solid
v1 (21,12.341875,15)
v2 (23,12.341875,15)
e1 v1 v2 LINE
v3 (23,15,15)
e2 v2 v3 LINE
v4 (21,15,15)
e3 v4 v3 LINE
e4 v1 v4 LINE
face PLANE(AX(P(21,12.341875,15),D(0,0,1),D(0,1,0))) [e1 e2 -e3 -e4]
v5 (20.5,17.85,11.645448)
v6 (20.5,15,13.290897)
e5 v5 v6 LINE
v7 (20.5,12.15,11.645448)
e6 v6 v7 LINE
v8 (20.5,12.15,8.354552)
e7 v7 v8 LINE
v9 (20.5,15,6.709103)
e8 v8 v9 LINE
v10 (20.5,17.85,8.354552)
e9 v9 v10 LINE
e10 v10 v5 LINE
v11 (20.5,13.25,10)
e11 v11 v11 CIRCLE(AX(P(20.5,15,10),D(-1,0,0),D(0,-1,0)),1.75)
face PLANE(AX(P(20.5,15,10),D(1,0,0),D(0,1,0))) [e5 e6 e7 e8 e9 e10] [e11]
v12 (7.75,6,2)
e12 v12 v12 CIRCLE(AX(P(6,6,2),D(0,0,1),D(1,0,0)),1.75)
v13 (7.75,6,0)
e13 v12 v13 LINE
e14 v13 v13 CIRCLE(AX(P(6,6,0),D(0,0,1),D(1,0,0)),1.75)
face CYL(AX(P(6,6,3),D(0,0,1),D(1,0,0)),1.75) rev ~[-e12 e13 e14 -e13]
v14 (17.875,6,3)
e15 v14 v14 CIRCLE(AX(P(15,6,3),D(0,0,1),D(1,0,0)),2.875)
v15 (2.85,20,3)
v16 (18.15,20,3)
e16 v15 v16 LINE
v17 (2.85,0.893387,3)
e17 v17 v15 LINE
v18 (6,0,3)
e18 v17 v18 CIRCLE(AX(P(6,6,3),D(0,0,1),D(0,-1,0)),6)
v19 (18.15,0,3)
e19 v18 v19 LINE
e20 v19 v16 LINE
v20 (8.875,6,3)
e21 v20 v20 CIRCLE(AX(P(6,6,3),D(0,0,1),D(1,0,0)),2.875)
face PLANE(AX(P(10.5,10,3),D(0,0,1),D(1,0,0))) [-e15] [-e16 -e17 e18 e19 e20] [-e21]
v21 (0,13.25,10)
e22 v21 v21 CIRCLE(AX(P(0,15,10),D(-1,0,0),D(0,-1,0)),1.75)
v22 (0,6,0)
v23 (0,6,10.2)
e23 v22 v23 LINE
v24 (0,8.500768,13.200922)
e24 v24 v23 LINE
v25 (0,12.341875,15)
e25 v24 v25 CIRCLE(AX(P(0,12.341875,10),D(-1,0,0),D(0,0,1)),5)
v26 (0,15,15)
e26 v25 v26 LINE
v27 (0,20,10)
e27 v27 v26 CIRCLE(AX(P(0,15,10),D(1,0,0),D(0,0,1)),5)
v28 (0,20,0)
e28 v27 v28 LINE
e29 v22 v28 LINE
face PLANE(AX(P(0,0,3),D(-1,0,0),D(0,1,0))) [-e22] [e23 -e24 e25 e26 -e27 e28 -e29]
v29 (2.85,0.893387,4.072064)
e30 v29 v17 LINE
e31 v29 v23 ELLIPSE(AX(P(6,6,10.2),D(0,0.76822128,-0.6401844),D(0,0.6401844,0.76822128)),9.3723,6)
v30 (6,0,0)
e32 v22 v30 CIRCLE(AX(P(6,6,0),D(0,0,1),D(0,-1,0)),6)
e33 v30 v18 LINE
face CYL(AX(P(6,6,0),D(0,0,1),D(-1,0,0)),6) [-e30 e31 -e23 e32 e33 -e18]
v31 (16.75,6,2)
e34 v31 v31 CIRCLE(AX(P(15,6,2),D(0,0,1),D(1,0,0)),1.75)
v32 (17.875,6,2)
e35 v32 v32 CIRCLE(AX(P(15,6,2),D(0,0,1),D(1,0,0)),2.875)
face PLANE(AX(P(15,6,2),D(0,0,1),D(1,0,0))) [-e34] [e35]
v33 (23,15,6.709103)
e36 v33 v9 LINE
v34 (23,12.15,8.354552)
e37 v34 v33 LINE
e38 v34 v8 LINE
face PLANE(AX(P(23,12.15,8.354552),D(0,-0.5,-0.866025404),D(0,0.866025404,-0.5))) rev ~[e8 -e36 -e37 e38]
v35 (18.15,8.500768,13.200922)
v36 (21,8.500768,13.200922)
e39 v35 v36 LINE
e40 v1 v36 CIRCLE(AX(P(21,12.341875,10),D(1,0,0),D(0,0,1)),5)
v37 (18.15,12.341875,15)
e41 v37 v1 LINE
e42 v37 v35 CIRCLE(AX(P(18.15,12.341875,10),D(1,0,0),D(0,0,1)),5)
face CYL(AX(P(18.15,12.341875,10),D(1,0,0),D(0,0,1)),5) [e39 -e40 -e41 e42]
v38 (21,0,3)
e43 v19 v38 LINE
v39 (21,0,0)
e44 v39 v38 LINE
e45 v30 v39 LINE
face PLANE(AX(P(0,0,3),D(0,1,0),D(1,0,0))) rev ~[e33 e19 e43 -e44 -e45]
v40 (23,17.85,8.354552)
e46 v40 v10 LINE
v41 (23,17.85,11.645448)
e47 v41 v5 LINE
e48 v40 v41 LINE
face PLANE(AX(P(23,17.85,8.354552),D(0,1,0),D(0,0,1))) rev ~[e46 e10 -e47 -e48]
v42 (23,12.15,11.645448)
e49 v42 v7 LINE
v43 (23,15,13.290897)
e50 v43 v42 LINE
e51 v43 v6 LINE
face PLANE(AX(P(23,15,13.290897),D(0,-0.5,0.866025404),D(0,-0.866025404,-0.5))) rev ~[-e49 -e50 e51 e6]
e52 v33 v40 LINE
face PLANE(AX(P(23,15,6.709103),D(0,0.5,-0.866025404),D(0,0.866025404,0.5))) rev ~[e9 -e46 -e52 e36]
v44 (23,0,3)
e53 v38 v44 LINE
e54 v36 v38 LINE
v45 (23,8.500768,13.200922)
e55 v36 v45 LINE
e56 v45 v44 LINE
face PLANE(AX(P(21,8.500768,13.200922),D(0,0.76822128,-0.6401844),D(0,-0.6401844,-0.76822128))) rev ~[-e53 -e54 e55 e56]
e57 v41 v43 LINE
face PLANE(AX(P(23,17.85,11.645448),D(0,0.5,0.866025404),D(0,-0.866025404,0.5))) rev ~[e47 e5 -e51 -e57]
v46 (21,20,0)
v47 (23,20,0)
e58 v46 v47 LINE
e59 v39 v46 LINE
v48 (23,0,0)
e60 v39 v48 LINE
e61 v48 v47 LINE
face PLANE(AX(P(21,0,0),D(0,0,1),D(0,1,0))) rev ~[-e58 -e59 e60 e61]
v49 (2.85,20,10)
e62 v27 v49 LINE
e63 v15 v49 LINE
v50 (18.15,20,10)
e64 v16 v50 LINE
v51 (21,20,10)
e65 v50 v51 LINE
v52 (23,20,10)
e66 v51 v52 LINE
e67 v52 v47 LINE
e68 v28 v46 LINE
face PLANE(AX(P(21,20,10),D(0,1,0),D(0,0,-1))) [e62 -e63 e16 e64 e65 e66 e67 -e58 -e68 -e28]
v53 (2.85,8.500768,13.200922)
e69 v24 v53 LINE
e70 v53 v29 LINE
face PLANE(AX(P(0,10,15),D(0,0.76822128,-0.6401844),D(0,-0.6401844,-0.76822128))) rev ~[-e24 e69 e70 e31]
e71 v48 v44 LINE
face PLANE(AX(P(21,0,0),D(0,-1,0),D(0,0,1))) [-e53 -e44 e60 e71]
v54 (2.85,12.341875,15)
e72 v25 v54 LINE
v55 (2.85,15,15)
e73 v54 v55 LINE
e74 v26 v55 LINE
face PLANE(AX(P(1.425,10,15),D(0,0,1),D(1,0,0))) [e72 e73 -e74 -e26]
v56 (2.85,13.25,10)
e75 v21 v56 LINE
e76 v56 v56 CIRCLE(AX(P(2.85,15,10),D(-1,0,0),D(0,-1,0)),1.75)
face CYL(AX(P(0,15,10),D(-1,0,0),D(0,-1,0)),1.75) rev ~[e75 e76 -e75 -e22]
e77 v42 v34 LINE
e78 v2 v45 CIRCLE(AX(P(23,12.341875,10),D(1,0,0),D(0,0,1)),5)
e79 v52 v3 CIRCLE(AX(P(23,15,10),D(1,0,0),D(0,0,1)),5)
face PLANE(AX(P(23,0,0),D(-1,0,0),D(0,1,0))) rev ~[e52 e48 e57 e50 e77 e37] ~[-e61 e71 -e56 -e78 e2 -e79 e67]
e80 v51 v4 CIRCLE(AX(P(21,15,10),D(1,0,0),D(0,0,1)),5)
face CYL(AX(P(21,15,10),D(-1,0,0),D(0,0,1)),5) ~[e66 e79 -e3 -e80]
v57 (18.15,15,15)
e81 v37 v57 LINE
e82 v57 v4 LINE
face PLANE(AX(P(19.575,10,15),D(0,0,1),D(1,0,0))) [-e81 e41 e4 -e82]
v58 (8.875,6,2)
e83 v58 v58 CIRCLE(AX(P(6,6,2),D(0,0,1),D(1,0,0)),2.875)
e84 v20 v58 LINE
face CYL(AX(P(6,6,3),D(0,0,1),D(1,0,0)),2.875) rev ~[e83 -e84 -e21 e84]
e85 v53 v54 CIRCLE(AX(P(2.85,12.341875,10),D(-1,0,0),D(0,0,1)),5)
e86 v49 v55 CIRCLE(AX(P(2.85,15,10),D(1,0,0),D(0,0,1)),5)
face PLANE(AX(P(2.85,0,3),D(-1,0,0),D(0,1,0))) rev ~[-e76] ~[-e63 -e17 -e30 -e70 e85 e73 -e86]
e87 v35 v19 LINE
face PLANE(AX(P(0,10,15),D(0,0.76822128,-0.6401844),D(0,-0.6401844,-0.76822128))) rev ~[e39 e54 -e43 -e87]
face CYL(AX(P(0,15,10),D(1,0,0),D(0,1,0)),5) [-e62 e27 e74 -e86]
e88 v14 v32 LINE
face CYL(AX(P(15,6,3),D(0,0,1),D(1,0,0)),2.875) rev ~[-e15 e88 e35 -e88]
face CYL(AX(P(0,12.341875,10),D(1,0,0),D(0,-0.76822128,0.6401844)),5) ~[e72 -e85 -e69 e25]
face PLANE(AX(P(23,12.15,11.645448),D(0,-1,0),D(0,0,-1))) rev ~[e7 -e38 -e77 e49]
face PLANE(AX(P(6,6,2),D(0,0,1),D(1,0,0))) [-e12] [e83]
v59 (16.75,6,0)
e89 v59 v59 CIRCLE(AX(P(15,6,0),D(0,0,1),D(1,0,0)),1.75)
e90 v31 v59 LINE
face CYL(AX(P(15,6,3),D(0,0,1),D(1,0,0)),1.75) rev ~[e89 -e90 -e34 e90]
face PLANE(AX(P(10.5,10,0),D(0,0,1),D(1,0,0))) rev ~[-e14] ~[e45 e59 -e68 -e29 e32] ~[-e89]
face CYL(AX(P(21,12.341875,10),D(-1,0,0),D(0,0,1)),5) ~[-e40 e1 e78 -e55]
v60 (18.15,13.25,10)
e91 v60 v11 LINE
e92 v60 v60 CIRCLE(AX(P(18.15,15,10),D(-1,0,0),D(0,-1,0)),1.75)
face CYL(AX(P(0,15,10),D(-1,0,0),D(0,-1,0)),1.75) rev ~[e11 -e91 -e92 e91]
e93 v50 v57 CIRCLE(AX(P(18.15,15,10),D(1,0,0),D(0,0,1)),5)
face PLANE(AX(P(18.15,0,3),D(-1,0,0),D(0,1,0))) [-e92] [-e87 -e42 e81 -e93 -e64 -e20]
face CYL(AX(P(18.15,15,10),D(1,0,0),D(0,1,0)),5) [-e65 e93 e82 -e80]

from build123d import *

# Parameters (mm, degrees)
F0_W      = 21
F0_H      = 20
F1_DEPTH  = 3
F2_W      = 2.85
F2_H      = 20
F3_DEPTH  = 12
F4_R      = 6
F5_R      = 1.75
F6_DEPTH  = 21.001
F7_R      = 5
F8_R      = 1.75
F9_DEPTH  = 3.001
F10_DEPTH = 2
F12_DEPTH = 2.5
F13_R     = 2.875
F14_DEPTH = 1


with BuildPart() as f1:
    # F0 (on Top) → F1 (new body)
    with BuildSketch(Plane.XY):
        with Locations((10.5, 10)):
            Rectangle(F0_W, F0_H)
    extrude(amount=F1_DEPTH)

    # F2 (on face) → F3 (join)
    with BuildSketch(Plane.XY.offset(3)):
        with Locations((1.425, 10)):
            Rectangle(F2_W, F2_H)
        with Locations((19.575, 10)):
            Rectangle(F2_W, F2_H)
    extrude(amount=F3_DEPTH)

    # F4
    f4_edges = [f1.edges().sort_by_distance(p)[0] for p in [
        (0, 0, 7.5),
    ]]
    fillet(f4_edges, radius=F4_R)

    # F5 (on face) → F6 (cut, through all)
    with BuildSketch(Plane(origin=(0, 0, 0), x_dir=(0, -1, 0), z_dir=(-1, 0, 0))):
        with Locations((-15, 10)):
            Circle(F5_R)
        Polygon((0, 15), (-10, 15), (0, 3), align=None)
    extrude(amount=-F6_DEPTH, mode=Mode.SUBTRACT)

    # F7
    f7_edges = [f1.edges().sort_by_distance(p)[0] for p in [
        (1.425, 20, 15),
        (19.575, 20, 15),
        (1.425, 10, 15),
        (19.575, 10, 15),
    ]]
    fillet(f7_edges, radius=F7_R)

    # F8 (on face) → F9 (cut, through all)
    with BuildSketch(Plane.XY.offset(3)):
        with Locations((6, 6)):
            Circle(F8_R)
        with Locations((15, 6)):
            Circle(F8_R)
    extrude(amount=-F9_DEPTH, mode=Mode.SUBTRACT)

    # F10 (add): a face of the model
    f10_faces = [f1.faces().sort_by_distance(p)[0] for p in [
        (21, 11.3560605972, 6.2794868265),
    ]]
    extrude(f10_faces, amount=F10_DEPTH)

    # F11 (on face) → F12 (cut)
    with BuildSketch(Plane.YZ.offset(23)):
        Polygon((17.85, 8.3545517328), (17.85, 11.6454482672), (15, 13.2908965344), (12.15, 11.6454482672), (12.15, 8.3545517328), (15, 6.7091034656), align=None)
    extrude(amount=-F12_DEPTH, mode=Mode.SUBTRACT)

    # F13 (on face) → F14 (cut)
    with BuildSketch(Plane.XY.offset(3)):
        with Locations((6, 6)):
            Circle(F13_R)
        with Locations((15, 6)):
            Circle(F13_R)
    extrude(amount=-F14_DEPTH, mode=Mode.SUBTRACT)


solid = f1.part
